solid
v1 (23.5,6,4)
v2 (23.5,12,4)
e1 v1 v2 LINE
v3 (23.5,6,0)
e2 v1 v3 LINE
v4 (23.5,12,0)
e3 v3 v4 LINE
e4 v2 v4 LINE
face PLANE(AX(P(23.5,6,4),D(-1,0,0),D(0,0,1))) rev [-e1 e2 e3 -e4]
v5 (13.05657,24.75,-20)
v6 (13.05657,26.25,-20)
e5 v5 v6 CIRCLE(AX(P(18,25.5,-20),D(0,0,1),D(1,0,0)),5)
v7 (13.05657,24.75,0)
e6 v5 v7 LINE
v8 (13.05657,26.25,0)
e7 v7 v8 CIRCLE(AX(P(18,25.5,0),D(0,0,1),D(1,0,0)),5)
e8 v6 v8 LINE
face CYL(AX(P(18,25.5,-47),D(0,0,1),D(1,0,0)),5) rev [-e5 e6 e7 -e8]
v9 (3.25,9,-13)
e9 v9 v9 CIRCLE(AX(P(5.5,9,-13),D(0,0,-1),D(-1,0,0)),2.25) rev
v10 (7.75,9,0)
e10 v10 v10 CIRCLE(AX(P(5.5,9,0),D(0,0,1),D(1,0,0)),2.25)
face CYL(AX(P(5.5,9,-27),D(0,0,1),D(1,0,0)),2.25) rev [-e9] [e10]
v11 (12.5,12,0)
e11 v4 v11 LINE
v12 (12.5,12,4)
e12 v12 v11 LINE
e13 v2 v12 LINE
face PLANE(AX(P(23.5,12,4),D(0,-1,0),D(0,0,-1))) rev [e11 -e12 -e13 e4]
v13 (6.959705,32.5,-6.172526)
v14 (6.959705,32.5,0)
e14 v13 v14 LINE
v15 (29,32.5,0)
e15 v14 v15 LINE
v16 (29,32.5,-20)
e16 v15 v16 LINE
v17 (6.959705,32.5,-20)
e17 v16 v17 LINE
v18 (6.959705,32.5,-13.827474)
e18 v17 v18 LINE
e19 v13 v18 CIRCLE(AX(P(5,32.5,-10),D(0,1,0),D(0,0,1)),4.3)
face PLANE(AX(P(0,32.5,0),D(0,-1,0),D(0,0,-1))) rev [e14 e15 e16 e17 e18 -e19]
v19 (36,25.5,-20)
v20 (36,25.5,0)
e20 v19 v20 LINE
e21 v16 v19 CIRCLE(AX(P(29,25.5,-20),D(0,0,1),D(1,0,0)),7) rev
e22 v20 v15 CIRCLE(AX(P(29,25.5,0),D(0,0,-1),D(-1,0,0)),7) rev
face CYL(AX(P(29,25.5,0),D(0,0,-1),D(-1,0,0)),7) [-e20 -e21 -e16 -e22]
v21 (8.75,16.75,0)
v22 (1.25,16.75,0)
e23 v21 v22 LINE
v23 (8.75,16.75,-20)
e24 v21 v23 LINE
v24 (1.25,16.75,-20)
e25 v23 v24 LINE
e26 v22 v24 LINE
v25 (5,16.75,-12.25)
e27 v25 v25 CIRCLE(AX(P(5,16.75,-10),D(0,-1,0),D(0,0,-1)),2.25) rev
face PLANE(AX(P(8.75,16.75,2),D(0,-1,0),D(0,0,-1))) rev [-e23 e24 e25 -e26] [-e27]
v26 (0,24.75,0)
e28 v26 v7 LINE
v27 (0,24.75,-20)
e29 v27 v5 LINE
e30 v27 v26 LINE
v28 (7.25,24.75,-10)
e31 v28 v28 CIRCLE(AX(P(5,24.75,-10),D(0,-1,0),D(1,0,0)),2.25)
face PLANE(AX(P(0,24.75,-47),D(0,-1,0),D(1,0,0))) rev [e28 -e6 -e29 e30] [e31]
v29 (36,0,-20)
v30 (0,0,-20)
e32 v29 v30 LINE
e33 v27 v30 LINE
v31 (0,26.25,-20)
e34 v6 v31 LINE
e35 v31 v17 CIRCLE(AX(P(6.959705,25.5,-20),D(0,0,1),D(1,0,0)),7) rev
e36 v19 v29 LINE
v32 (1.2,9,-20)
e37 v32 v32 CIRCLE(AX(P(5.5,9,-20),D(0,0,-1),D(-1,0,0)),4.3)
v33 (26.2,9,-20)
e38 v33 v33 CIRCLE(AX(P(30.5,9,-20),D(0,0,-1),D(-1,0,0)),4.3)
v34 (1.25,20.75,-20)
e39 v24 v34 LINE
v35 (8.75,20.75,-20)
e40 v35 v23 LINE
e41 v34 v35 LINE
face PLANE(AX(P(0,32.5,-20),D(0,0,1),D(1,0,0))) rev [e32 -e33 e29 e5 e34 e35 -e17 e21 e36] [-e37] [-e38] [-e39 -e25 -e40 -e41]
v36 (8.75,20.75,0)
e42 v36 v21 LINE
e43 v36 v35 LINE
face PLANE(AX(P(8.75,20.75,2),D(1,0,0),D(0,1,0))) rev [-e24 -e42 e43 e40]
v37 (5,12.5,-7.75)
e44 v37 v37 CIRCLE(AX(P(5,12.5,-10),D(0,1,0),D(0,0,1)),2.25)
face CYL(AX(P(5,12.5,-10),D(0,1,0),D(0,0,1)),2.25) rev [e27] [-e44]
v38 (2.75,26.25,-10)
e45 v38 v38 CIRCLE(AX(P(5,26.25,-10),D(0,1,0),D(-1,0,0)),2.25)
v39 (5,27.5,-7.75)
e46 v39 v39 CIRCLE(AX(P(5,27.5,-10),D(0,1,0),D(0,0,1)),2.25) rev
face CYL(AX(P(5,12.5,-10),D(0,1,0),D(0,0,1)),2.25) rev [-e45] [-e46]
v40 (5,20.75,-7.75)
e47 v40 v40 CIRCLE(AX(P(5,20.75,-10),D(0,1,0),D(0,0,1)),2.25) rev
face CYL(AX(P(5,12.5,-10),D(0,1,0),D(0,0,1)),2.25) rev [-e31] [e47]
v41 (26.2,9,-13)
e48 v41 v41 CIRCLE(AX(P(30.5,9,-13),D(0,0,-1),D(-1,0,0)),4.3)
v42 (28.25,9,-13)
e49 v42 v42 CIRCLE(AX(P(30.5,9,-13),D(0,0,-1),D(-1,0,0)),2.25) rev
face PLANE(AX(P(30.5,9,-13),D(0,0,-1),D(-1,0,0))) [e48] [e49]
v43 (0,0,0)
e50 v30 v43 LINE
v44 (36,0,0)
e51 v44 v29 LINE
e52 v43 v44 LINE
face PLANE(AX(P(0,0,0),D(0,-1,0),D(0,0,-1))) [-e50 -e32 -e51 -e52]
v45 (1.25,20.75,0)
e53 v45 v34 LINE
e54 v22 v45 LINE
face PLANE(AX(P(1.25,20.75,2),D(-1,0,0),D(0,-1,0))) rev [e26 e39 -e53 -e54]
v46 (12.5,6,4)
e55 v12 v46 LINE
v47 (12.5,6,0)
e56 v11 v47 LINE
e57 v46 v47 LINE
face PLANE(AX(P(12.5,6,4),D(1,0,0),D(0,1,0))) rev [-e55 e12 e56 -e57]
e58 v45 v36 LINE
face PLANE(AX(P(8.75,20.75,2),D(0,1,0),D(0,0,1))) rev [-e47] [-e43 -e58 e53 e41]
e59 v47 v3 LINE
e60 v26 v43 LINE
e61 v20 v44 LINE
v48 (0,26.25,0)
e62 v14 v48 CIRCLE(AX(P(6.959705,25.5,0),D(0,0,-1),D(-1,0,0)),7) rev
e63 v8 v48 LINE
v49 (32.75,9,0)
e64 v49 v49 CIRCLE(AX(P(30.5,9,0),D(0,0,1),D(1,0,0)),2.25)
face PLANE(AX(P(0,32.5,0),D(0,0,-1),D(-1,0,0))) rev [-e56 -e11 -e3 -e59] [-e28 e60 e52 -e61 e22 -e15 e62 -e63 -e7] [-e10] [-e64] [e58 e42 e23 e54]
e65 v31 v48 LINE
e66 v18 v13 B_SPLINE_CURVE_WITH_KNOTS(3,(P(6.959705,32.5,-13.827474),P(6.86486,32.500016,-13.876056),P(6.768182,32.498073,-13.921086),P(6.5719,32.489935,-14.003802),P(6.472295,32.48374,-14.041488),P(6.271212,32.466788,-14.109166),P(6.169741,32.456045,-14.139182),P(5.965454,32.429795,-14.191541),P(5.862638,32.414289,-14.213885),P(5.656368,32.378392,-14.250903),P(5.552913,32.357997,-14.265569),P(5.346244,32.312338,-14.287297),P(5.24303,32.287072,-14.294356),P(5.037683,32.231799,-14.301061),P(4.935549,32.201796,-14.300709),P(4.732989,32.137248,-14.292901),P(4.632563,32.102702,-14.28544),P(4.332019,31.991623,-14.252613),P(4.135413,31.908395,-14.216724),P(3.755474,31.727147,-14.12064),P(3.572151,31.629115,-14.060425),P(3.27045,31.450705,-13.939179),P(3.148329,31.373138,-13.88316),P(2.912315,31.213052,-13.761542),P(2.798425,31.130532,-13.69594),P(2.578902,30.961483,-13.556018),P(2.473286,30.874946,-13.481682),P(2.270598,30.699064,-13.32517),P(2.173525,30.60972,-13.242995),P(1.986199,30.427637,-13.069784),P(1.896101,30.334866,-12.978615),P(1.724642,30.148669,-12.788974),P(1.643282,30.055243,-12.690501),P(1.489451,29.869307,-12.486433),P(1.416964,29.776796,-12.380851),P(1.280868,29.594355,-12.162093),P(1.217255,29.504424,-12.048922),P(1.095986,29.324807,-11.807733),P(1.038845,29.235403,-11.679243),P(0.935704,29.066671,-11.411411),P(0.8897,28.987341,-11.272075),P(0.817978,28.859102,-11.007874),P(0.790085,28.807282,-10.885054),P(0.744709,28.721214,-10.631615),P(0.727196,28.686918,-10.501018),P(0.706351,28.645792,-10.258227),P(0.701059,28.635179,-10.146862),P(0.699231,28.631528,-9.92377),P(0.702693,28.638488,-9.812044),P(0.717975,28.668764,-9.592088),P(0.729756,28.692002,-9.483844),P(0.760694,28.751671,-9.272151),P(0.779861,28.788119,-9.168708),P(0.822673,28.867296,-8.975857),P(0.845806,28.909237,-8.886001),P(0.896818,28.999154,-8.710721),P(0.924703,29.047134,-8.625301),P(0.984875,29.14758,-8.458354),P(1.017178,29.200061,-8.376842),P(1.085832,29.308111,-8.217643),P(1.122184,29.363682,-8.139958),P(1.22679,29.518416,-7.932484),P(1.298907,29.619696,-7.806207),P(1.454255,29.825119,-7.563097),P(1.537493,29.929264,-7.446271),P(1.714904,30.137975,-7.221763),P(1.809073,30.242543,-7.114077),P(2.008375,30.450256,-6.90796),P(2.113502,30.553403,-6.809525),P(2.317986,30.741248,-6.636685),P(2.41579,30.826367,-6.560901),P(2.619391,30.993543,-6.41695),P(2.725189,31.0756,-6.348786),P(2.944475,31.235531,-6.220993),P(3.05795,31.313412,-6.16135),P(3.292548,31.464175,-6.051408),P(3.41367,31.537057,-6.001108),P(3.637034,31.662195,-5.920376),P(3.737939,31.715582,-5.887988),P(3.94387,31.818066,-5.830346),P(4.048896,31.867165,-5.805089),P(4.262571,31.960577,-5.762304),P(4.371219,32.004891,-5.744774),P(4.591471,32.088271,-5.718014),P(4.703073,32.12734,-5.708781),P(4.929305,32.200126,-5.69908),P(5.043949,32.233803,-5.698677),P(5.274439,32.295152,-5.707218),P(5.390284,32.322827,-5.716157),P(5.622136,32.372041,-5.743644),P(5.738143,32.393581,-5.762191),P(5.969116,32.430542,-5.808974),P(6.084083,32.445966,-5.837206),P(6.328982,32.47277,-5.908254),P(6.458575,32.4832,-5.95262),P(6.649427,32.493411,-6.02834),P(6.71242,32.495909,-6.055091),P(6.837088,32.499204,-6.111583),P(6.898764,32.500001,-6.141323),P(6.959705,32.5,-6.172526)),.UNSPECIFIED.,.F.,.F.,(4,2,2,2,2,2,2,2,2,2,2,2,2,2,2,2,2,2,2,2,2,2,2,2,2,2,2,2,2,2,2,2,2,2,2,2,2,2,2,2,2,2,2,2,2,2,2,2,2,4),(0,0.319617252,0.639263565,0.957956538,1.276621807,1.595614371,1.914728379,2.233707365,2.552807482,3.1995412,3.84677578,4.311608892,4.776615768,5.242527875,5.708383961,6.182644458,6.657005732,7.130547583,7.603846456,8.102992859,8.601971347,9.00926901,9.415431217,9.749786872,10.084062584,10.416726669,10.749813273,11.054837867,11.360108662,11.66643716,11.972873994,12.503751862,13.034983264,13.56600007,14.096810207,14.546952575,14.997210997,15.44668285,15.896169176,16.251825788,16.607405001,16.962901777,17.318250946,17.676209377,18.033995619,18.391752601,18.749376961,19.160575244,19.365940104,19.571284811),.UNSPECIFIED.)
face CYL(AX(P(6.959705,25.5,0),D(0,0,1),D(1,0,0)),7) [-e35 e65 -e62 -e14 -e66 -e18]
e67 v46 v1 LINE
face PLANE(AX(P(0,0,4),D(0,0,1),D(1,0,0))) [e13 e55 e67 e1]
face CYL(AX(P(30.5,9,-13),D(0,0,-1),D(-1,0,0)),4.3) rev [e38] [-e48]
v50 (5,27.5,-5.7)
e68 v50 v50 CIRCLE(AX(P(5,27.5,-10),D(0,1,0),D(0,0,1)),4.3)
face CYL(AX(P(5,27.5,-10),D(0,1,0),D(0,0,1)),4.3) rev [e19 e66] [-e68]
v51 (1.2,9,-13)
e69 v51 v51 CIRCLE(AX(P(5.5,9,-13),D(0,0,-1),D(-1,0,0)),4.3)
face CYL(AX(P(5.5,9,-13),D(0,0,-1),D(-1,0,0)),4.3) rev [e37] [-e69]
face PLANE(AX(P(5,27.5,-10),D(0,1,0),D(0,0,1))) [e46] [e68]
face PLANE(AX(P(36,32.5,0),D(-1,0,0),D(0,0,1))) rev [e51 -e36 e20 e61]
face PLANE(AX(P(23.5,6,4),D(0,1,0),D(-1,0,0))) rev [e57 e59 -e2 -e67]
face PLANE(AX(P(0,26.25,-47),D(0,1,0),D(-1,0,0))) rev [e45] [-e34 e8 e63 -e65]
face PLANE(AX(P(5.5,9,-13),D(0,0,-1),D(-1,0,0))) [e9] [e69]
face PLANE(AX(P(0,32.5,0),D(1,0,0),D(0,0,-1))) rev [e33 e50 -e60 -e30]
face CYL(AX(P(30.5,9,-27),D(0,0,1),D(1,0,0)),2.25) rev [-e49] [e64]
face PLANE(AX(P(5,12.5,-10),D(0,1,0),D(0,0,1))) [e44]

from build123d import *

# Parameters (mm, degrees)
SKETCH_1_W           = 36
SKETCH_1_H           = 20
EXTRUDE_1_DEPTH      = 32.5
SKETCH_4_R           = 5
CUT_EXTRUDE_2_DEPTH  = 47
SKETCH_9_R           = 2.25
CUT_EXTRUDE_7_DEPTH  = 27
SKETCH_10_W          = 11
SKETCH_10_H          = 6
EXTRUDE_2_DEPTH      = 4
SKETCH_11_R          = 2.25
CUT_EXTRUDE_8_DEPTH  = 20
SKETCH_12_R          = 4.3
CUT_EXTRUDE_9_DEPTH  = 5
SKETCH_13_W          = 7.5
SKETCH_13_H          = 4
CUT_EXTRUDE_10_DEPTH = 22
SKETCH_14_R          = 4.3
CUT_EXTRUDE_11_DEPTH = 7
FILLET_1_R           = 7


with BuildPart() as part:
    # Эскиз1 → Бобышка-Вытянуть1 (new body)
    with BuildSketch(Plane(origin=(0, 0, 0), x_dir=(1, 0, 0), z_dir=(0, 1, 0))):
        with Locations((18, 10)):
            Rectangle(SKETCH_1_W, SKETCH_1_H)
    extrude(amount=EXTRUDE_1_DEPTH)

    # Эскиз4 → Вырез-Вытянуть2 (cut)
    with BuildSketch(Plane.XY):
        with Locations((18, 25.5)):
            Circle(SKETCH_4_R)
        with BuildLine():
            ThreePointArc((13.056570017, 24.75), (13, 25.5), (13.056570017, 26.25))
            Line((13.056570017, 26.25), (0, 26.25))
            Line((0, 26.25), (0, 24.75))
            Line((0, 24.75), (13.056570017, 24.75))
        make_face()
    extrude(amount=-CUT_EXTRUDE_2_DEPTH, mode=Mode.SUBTRACT)

    # Эскиз9 → Вырез-Вытянуть7 (cut)
    with BuildSketch(Plane.XY):
        with Locations((30.5, 9)):
            Circle(SKETCH_9_R)
        with Locations((5.5, 9)):
            Circle(SKETCH_9_R)
    extrude(amount=-CUT_EXTRUDE_7_DEPTH, mode=Mode.SUBTRACT)

    # Эскиз10 → Бобышка-Вытянуть2 (add)
    with BuildSketch(Plane.XY):
        with Locations((18, 9)):
            Rectangle(SKETCH_10_W, SKETCH_10_H)
    extrude(amount=EXTRUDE_2_DEPTH)

    # Эскиз11 → Вырез-Вытянуть8 (cut)
    with BuildSketch(Plane(origin=(0, 32.5, 0), x_dir=(1, 0, 0), z_dir=(0, 1, 0))):
        with Locations(Location((5, 10, 0), (0, 0, 270))):
            Circle(SKETCH_11_R)
    extrude(amount=-CUT_EXTRUDE_8_DEPTH, mode=Mode.SUBTRACT)

    # Эскиз12 → Вырез-Вытянуть9 (cut)
    with BuildSketch(Plane(origin=(0, 32.5, 0), x_dir=(1, 0, 0), z_dir=(0, 1, 0))):
        with Locations(Location((5, 10, 0), (0, 0, 270))):
            Circle(SKETCH_12_R)
    extrude(amount=-CUT_EXTRUDE_9_DEPTH, mode=Mode.SUBTRACT)

    # Эскиз13 → Вырез-Вытянуть10 (cut)
    with BuildSketch(Plane(origin=(0, 0, -20), x_dir=(-1, 0, 0), z_dir=(0, 0, -1))):
        with Locations((-5, 18.75)):
            Rectangle(SKETCH_13_W, SKETCH_13_H)
    extrude(amount=-CUT_EXTRUDE_10_DEPTH, mode=Mode.SUBTRACT)

    # Эскиз14 → Вырез-Вытянуть11 (cut)
    with BuildSketch(Plane(origin=(0, 0, -20), x_dir=(-1, 0, 0), z_dir=(0, 0, -1))):
        with Locations((-30.5, 9)):
            Circle(SKETCH_14_R)
        with Locations((-5.5, 9)):
            Circle(SKETCH_14_R)
    extrude(amount=-CUT_EXTRUDE_11_DEPTH, mode=Mode.SUBTRACT)

    # Скругление1
    # the kernel refuses this fillet: 7 mm, written as the material it takes off along each edge
    with BuildSketch(Plane(origin=(36, 32.5, 17.5), x_dir=(0, -1, 0), z_dir=(0, 0, -1))) as fillet_1_piece_1:
        with BuildLine():
            CenterArc((FILLET_1_R, FILLET_1_R), FILLET_1_R, 180, 90)
            Line((0, FILLET_1_R), (0, 0))
            Line((0, 0), (FILLET_1_R, 0))
        make_face()
    extrude(amount=55, mode=Mode.SUBTRACT)
    with BuildSketch(Plane(origin=(0, 32.5, -37.399263634), x_dir=(1, 0, 0), z_dir=(0, 0, 1))) as fillet_1_piece_2:
        with BuildLine():
            CenterArc((6.959705454, -7), FILLET_1_R, 90, 83.849360172)
            Line((0, -6.25), (0, 0))
            Line((0, 0), (6.959705454, 0))
        make_face()
    extrude(amount=54.798527268, mode=Mode.SUBTRACT)


solid = part.part
